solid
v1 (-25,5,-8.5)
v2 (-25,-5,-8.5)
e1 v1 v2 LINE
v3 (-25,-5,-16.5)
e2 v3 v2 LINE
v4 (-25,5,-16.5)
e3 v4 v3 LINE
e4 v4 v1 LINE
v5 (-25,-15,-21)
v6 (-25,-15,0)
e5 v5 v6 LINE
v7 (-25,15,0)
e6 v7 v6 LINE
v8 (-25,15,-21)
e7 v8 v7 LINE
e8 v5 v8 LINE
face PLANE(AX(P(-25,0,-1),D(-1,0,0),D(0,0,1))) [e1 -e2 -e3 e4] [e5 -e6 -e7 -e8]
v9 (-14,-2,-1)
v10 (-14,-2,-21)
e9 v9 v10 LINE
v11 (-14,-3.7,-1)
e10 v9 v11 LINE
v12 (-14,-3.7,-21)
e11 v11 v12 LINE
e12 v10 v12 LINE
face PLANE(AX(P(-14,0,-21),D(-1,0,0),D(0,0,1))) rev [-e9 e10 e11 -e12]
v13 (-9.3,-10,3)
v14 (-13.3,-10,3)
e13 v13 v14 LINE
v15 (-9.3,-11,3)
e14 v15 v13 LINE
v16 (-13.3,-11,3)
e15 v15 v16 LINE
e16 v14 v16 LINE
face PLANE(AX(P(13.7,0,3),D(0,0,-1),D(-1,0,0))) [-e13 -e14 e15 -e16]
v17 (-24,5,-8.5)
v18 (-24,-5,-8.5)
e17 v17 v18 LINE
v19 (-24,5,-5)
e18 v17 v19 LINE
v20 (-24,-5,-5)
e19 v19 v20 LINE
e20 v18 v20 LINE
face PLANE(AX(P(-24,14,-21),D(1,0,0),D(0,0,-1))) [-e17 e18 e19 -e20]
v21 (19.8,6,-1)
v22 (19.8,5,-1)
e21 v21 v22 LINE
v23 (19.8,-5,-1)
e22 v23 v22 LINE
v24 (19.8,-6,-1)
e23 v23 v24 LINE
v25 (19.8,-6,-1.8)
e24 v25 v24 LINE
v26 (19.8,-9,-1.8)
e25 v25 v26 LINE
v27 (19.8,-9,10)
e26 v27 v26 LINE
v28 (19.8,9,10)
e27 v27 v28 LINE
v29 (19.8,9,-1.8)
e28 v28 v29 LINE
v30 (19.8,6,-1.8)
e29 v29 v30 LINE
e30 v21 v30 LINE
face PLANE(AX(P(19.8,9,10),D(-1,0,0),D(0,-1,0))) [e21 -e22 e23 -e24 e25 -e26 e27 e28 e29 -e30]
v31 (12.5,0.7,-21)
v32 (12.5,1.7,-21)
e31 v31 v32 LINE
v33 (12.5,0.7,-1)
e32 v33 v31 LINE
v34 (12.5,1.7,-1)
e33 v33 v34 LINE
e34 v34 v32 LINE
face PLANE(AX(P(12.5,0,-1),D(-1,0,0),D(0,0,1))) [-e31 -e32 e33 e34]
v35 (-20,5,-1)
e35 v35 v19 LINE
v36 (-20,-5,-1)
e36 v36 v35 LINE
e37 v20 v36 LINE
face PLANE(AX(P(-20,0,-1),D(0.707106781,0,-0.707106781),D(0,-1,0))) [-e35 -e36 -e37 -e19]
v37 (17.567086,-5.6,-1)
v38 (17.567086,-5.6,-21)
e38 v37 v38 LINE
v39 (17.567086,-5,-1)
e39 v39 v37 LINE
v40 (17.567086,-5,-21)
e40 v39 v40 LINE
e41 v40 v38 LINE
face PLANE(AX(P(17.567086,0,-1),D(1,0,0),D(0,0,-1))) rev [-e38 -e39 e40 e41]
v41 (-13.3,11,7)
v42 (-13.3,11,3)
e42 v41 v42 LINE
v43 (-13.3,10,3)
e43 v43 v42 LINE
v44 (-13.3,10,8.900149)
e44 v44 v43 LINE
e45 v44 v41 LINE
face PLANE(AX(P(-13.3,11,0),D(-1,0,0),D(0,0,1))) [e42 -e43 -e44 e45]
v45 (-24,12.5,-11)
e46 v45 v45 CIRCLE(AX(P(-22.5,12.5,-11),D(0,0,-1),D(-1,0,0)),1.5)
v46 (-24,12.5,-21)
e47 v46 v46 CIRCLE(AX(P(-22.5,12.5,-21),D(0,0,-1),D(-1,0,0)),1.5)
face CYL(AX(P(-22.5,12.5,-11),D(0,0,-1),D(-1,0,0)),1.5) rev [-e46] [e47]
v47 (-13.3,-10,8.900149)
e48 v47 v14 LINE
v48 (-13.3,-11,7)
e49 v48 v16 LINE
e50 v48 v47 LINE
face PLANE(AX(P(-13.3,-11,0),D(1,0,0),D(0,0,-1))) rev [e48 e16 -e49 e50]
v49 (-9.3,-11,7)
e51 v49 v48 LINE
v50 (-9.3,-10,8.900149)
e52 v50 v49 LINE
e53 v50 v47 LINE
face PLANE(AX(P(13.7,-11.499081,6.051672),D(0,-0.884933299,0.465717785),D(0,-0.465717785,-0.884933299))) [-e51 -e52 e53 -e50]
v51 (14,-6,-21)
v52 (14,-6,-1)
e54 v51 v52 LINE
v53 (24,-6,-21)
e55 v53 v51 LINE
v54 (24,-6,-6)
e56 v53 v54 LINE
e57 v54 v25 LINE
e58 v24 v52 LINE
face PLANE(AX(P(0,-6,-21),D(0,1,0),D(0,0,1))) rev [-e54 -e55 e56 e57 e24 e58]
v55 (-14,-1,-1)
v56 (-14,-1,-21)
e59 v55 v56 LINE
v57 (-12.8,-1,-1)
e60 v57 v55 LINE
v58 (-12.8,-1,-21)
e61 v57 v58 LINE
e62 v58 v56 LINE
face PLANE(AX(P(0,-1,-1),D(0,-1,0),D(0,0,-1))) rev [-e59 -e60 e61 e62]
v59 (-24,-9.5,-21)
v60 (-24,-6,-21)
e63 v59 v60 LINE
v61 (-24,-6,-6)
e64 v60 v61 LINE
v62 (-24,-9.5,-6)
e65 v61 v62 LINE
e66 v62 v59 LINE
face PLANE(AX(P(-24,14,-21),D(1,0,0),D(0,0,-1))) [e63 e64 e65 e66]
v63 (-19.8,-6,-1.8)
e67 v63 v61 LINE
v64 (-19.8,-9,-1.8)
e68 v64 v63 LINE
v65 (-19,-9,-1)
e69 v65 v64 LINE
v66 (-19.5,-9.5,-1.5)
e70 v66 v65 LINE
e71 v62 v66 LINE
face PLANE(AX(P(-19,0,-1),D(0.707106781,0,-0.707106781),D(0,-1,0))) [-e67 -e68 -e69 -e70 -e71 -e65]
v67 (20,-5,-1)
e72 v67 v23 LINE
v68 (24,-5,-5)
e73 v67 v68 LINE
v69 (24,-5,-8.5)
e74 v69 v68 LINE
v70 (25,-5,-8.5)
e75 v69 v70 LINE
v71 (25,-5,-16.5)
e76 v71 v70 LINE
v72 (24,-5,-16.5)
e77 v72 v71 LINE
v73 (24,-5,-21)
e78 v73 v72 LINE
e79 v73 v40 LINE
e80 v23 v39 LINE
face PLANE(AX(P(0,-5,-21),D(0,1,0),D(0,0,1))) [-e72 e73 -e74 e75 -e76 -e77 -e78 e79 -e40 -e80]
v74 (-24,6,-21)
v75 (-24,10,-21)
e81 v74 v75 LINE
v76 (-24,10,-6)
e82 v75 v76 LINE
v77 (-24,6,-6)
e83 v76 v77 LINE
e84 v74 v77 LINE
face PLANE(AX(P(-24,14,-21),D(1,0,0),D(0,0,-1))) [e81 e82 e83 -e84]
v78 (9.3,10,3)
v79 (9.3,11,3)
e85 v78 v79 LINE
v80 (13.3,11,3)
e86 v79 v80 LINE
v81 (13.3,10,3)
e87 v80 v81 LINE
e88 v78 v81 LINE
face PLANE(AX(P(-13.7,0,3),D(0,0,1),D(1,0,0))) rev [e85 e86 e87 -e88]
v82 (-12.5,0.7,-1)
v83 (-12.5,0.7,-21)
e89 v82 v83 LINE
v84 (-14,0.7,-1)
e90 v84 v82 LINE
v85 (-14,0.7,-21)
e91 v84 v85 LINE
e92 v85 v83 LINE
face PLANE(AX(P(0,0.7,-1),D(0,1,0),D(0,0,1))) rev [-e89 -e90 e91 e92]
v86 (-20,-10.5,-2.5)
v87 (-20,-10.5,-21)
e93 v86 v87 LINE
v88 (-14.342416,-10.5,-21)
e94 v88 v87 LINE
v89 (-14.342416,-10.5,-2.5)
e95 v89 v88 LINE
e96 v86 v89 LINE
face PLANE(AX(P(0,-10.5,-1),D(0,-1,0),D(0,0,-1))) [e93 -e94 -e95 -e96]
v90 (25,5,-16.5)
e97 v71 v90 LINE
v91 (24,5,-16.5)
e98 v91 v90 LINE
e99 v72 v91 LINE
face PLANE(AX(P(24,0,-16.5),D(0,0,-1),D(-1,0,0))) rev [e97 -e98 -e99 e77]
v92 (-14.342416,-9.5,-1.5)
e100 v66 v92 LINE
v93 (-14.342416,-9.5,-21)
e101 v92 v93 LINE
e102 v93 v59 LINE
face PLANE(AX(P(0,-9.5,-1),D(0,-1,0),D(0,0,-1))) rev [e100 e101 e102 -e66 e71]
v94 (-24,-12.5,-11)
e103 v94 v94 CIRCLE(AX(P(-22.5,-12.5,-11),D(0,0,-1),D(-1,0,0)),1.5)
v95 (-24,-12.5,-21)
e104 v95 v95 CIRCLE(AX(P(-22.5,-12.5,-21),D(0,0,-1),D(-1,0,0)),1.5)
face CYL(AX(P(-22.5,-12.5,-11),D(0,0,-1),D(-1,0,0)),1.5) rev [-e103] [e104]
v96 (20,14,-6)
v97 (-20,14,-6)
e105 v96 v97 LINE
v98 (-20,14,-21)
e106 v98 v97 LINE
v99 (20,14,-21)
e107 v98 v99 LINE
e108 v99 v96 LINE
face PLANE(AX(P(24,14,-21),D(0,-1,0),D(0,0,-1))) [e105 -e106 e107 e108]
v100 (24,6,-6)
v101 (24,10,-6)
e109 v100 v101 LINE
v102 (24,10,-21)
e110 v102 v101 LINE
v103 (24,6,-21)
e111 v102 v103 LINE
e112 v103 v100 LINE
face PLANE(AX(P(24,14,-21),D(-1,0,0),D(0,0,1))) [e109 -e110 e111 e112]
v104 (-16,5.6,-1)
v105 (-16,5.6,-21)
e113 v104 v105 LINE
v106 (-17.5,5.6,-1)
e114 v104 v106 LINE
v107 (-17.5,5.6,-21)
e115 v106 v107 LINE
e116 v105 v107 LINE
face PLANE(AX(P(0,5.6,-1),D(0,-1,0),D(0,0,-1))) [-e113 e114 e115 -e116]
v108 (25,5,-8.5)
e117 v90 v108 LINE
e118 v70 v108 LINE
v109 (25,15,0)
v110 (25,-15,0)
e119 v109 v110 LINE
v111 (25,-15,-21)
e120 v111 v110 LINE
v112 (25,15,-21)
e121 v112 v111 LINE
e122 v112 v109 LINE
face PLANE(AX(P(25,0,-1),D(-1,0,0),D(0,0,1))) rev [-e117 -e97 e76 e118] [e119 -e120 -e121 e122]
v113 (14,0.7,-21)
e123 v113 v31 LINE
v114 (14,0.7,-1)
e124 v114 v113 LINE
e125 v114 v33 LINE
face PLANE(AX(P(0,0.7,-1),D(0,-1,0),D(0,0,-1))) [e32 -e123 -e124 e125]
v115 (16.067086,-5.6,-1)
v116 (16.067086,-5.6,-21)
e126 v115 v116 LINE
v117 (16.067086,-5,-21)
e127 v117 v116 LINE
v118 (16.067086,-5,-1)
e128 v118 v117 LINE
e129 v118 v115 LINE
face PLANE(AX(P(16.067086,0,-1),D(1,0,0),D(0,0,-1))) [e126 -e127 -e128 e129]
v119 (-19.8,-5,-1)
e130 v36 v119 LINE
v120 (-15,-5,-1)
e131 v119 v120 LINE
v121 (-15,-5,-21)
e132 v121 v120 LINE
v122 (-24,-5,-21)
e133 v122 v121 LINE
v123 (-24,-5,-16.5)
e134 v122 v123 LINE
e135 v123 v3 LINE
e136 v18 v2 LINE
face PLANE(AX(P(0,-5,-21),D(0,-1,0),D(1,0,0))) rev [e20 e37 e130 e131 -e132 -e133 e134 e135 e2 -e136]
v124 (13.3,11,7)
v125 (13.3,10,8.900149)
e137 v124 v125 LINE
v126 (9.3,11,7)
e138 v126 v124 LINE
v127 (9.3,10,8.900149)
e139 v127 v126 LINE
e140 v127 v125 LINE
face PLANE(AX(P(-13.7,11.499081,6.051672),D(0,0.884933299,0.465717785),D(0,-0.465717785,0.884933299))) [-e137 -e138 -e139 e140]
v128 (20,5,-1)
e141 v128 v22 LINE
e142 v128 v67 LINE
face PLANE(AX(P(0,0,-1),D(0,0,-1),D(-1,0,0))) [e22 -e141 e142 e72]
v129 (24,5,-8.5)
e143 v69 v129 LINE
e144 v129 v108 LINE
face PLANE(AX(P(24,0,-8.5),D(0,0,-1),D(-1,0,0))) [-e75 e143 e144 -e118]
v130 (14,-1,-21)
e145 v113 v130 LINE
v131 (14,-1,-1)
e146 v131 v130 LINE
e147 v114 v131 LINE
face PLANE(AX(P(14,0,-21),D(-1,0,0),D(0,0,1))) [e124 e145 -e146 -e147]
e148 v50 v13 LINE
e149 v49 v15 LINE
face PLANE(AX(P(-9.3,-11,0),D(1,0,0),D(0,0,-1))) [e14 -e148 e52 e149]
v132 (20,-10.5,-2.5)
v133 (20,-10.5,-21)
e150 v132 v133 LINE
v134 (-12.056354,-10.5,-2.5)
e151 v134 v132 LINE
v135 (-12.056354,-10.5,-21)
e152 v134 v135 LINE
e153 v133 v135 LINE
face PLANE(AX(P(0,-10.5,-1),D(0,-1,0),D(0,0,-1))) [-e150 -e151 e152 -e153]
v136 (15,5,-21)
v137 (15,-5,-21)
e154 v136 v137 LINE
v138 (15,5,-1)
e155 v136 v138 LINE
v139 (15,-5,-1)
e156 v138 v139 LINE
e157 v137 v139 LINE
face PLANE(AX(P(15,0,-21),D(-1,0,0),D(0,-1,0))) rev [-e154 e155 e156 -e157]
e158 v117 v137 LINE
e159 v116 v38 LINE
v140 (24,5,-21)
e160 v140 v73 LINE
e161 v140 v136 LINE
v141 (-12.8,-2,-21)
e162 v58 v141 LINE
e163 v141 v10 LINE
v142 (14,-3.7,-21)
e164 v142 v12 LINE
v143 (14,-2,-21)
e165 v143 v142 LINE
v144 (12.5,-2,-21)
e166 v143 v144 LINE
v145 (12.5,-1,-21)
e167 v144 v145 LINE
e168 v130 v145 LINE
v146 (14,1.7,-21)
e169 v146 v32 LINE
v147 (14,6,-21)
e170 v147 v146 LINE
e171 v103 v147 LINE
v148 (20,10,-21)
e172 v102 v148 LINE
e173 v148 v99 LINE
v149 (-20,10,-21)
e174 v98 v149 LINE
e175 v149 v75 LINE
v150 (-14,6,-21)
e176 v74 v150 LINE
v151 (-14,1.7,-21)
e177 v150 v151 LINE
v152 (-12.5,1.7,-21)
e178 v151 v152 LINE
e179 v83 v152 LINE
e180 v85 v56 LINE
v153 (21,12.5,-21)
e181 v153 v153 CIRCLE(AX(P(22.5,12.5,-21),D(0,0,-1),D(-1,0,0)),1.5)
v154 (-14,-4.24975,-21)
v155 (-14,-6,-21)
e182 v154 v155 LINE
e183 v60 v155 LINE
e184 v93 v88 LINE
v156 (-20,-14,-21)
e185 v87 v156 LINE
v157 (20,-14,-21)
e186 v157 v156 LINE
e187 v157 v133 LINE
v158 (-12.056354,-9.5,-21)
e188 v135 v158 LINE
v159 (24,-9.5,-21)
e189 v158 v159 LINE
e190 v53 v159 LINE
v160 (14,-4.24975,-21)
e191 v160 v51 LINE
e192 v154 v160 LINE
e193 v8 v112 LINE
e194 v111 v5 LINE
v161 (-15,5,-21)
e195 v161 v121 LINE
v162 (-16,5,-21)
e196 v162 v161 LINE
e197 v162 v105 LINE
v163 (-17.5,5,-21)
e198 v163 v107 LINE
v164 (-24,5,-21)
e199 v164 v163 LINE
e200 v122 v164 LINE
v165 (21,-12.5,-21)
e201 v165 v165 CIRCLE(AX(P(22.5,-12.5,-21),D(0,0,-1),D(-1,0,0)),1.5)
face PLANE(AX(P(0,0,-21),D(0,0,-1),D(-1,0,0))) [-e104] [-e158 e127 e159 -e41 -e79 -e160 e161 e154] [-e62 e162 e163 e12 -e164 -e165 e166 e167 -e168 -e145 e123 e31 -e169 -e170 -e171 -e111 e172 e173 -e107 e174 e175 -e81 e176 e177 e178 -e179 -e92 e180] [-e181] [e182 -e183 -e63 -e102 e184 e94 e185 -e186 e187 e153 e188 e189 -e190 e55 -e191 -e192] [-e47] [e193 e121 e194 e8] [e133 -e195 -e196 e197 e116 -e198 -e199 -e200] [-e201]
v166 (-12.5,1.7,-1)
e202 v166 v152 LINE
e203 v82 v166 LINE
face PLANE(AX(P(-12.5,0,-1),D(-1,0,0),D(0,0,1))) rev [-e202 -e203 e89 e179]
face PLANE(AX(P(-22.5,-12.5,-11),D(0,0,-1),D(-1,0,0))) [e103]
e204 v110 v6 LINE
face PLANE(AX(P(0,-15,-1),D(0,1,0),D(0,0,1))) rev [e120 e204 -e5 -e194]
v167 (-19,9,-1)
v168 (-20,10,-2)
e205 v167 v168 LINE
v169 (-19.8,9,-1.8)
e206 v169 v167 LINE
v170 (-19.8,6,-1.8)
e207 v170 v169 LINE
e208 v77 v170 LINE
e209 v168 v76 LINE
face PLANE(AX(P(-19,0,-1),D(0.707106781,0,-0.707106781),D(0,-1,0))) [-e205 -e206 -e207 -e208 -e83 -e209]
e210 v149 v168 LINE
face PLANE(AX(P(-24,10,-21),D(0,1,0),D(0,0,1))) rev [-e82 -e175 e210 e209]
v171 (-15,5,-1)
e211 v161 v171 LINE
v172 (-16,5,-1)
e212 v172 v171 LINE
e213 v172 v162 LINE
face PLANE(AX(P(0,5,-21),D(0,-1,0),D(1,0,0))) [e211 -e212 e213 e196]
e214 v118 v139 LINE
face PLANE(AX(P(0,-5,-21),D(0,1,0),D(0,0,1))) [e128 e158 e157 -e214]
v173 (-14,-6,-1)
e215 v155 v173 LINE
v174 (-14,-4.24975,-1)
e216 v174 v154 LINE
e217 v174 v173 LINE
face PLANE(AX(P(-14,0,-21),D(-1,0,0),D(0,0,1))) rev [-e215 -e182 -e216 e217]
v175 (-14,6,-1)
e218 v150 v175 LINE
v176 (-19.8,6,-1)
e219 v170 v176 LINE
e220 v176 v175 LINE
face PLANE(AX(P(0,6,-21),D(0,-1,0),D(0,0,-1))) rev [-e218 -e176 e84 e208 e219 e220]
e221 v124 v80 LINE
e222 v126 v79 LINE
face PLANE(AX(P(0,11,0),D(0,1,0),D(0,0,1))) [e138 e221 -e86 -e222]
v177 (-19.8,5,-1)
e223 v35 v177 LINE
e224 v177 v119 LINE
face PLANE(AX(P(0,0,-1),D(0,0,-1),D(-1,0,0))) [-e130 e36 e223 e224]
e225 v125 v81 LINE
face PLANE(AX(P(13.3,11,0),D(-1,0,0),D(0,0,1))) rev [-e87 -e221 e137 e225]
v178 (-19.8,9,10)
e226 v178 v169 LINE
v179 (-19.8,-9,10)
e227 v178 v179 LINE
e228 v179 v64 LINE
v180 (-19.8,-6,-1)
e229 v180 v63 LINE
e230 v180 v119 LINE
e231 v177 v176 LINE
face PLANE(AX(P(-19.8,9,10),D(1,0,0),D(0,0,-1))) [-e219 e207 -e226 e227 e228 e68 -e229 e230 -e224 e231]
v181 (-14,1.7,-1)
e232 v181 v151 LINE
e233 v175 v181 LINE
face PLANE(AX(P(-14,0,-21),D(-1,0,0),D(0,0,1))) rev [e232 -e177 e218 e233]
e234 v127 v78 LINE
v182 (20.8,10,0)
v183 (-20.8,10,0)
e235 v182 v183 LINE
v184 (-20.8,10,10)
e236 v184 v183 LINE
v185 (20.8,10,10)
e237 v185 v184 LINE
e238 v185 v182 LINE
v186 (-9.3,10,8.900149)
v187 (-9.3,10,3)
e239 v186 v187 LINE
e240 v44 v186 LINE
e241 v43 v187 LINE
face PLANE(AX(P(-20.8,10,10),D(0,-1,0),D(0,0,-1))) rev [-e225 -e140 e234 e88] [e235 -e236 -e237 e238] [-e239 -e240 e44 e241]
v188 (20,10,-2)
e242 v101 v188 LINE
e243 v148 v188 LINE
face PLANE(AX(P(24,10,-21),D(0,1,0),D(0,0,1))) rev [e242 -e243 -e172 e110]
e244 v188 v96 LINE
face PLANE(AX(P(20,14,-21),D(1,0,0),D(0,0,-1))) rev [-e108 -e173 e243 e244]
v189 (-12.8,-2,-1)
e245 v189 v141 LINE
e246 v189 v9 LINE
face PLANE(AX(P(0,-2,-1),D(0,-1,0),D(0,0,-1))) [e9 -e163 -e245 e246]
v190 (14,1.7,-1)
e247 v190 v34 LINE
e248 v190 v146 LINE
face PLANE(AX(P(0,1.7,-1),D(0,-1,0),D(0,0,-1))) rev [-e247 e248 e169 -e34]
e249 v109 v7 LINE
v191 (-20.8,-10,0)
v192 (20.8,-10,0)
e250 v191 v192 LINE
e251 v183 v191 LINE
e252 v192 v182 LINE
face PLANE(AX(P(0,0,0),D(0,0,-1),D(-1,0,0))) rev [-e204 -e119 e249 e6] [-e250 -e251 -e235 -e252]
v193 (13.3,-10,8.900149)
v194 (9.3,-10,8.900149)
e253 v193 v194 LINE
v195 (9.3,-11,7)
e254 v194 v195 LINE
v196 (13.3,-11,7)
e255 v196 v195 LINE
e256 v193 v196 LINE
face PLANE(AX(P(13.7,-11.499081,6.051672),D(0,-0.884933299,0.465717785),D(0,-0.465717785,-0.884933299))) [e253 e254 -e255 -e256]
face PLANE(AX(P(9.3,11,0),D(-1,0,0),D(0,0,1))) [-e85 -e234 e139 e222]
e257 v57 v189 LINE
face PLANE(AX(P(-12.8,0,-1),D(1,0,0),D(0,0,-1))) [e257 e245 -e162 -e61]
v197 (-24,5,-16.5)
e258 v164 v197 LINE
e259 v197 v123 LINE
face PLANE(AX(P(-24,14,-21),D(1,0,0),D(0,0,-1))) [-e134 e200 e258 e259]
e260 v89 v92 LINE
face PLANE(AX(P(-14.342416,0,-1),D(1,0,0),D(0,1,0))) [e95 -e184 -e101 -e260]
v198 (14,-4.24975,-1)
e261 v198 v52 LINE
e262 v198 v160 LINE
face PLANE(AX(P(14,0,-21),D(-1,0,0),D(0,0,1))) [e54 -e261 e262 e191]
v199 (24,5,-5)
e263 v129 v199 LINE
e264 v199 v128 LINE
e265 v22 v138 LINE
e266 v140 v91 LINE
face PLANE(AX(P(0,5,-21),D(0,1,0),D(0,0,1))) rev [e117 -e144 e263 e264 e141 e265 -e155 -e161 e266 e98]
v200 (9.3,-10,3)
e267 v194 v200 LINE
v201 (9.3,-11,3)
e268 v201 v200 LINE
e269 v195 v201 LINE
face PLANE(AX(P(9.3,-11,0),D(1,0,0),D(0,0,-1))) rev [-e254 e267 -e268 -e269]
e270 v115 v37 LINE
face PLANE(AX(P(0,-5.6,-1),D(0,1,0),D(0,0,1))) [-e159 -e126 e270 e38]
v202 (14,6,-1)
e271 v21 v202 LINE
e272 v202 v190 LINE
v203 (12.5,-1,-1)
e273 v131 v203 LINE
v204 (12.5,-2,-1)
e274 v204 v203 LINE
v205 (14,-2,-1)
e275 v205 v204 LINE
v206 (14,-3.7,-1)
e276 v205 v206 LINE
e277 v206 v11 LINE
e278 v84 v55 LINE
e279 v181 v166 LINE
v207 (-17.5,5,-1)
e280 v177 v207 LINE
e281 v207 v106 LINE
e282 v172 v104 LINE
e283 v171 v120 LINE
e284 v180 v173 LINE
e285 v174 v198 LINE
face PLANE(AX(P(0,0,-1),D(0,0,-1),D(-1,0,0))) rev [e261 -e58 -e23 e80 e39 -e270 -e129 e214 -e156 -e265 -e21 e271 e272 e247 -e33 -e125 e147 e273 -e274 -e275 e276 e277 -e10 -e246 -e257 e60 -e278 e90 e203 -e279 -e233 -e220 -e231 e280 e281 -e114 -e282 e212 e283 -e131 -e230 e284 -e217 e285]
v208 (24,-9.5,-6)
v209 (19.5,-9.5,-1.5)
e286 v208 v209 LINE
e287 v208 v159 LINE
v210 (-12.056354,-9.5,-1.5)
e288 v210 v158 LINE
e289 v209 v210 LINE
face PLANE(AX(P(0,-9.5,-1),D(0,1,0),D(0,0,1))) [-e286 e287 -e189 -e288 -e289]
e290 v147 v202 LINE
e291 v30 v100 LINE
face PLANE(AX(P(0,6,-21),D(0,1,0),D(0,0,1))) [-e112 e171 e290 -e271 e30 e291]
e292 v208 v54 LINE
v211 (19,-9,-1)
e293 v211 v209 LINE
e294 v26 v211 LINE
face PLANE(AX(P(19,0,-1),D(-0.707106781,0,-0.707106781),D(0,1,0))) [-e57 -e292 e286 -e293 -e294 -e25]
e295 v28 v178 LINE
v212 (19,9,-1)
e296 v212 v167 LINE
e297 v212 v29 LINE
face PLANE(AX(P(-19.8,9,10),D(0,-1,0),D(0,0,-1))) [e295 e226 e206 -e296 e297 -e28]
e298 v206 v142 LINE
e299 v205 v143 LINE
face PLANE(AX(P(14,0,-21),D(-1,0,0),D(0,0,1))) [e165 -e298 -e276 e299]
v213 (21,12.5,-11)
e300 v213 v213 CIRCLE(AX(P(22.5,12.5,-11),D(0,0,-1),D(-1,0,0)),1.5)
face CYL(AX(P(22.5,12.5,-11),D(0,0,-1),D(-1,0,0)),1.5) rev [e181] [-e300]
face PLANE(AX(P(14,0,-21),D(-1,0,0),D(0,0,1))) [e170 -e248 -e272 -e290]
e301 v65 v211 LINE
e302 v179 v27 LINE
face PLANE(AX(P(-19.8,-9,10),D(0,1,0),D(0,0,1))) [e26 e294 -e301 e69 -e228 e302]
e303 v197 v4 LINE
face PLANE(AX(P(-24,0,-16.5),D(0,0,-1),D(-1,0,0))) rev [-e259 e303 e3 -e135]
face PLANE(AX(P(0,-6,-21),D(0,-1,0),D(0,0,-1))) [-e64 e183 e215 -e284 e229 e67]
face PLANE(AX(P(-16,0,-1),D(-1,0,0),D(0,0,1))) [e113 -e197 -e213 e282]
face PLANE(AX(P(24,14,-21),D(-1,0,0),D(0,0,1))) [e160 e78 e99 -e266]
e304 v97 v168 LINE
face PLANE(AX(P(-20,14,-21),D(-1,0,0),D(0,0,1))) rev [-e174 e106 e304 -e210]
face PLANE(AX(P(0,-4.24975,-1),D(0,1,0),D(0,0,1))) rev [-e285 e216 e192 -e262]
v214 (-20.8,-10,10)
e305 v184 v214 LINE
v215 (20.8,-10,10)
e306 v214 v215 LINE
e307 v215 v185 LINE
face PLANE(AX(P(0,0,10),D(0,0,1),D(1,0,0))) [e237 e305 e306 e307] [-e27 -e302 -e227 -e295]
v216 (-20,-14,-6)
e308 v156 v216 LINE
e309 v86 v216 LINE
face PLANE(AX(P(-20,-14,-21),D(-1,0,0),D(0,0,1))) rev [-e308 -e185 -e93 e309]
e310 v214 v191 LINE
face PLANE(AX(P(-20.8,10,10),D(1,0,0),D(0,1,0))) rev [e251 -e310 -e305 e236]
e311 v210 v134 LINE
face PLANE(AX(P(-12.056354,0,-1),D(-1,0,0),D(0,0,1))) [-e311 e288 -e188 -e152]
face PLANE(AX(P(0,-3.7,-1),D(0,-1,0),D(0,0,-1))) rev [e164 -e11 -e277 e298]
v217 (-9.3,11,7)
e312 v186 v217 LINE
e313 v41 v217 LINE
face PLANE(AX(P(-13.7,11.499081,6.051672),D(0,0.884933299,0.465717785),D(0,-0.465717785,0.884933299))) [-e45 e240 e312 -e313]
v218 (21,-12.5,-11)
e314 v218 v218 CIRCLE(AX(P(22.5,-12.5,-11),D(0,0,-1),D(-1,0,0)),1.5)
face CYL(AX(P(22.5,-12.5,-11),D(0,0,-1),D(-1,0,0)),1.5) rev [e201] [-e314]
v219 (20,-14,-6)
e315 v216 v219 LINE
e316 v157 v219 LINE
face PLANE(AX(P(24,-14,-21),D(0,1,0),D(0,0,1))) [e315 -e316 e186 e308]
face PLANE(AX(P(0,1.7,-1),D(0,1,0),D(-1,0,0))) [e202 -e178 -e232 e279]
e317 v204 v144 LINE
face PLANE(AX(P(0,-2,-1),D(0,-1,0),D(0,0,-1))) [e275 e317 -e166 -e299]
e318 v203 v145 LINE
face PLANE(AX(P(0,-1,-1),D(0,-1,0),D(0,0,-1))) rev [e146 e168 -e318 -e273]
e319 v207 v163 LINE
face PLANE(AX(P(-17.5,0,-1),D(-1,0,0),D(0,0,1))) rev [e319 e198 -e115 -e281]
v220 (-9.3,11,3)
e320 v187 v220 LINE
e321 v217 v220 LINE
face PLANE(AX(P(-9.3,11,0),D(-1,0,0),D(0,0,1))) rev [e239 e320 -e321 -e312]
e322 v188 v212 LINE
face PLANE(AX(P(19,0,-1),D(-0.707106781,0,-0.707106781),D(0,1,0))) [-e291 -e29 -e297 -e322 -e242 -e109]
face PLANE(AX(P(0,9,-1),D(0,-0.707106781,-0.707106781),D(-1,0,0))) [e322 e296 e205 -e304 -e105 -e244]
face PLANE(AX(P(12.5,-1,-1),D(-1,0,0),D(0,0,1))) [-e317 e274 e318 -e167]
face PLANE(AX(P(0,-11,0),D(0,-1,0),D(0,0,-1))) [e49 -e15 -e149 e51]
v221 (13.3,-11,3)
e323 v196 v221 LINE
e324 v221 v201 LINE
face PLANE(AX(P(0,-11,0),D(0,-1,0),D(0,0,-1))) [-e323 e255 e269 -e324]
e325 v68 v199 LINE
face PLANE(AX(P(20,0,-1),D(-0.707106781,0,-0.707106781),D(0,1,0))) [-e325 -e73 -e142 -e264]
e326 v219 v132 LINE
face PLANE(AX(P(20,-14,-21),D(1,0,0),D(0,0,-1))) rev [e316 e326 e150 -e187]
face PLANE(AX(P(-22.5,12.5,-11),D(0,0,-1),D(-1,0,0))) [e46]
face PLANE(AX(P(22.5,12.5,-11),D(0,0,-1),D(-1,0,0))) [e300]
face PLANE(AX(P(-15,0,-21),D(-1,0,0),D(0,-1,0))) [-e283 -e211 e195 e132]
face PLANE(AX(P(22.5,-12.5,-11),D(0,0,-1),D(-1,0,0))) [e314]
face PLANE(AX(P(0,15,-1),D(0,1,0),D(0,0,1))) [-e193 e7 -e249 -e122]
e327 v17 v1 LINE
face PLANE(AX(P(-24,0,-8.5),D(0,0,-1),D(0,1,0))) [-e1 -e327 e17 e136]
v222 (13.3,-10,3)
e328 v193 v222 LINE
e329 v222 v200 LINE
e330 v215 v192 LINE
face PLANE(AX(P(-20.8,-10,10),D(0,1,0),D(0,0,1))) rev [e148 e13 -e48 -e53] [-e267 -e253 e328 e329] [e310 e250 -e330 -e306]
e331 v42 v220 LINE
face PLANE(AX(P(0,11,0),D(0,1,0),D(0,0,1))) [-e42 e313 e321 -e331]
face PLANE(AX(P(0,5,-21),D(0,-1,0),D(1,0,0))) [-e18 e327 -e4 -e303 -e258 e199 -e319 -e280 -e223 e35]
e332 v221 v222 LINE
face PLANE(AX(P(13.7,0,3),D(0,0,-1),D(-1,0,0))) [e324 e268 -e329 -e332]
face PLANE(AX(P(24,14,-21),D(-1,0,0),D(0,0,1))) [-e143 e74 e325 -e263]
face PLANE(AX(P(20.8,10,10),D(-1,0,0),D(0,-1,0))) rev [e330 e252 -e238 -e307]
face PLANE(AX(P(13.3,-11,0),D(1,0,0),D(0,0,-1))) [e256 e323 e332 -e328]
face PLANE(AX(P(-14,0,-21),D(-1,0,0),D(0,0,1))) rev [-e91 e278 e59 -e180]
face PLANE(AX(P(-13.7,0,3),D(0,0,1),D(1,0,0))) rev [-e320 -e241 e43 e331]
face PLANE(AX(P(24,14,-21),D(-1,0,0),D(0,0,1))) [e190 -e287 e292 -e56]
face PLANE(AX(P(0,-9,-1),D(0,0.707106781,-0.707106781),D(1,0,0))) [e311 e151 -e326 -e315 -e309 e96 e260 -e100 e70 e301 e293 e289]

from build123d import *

# Parameters (mm, degrees)
SKETCH1_W            = 41.6
SKETCH1_H            = 20
SKETCH1_W_2          = 39.6
SKETCH1_H_2          = 18
BOSS_EXTRUDE2_DEPTH  = 10
SKETCH2_W            = 4
SKETCH2_H            = 10
BOSS_EXTRUDE3_DEPTH  = 1
SKETCH3_W            = 3
SKETCH3_H            = 1
CUT_EXTRUDE1_DEPTH   = 27
SKETCH4_W            = 4
SKETCH4_H            = 10
BOSS_EXTRUDE4_DEPTH  = 1
SKETCH5_W            = 3
SKETCH5_H            = 1
CUT_EXTRUDE2_DEPTH   = 27
SKETCH6_W            = 50
SKETCH6_H            = 30
SKETCH6_W_2          = 41.6
SKETCH6_H_2          = 20
SKETCH6_W_3          = 39.6
SKETCH6_H_3          = 18
BOSS_EXTRUDE6_DEPTH  = 1
SKETCH7_W            = 50
SKETCH7_H            = 30
SKETCH7_W_2          = 48
SKETCH7_H_2          = 28
BOSS_EXTRUDE7_DEPTH  = 20
SKETCH8_W            = 4.2
SKETCH8_H            = 1
BOSS_EXTRUDE8_DEPTH  = 20
SKETCH9_W            = 4.2
SKETCH9_H            = 1
BOSS_EXTRUDE9_DEPTH  = 20
SKETCH10_W           = 4
SKETCH10_H           = 4
BOSS_EXTRUDE10_DEPTH = 20
SKETCH11_W           = 2
SKETCH11_H           = 10
CUT_EXTRUDE3_DEPTH   = 1
SKETCH12_W           = 2
SKETCH12_H           = 10
CUT_EXTRUDE4_DEPTH   = 1
SKETCH13_R           = 1.5
CUT_EXTRUDE5_DEPTH   = 10
CHAMFER2_SIZE        = 5
CHAMFER3_SIZE        = 5
CHAMFER4_SIZE        = 4
SKETCH16_W           = 1.2
SKETCH16_H           = 1
BOSS_EXTRUDE11_DEPTH = 20
BOSS_EXTRUDE12_DEPTH = 20
SKETCH18_W           = 28
SKETCH18_H           = 0.549749779
BOSS_EXTRUDE13_DEPTH = 20
SKETCH19_W           = 1.2
SKETCH19_H           = 1
CUT_EXTRUDE6_DEPTH   = 20
SKETCH20_W           = 1.5
SKETCH20_H           = 1
BOSS_EXTRUDE14_DEPTH = 20
SKETCH22_W           = 0.3
SKETCH22_H           = 1
BOSS_EXTRUDE16_DEPTH = 20
SKETCH24_W           = 1.2
SKETCH24_H           = 1
CUT_EXTRUDE7_DEPTH   = 20
SKETCH25_W           = 1.5
SKETCH25_H           = 1
BOSS_EXTRUDE17_DEPTH = 20
SKETCH26_W           = 1.5
SKETCH26_H           = 0.6
CUT_EXTRUDE8_DEPTH   = 20
SKETCH27_W           = 1.5
SKETCH27_H           = 0.6
CUT_EXTRUDE9_DEPTH   = 20


# Some blends are built 0.0001 mm under size
with BuildPart() as part:
    # Sketch1 → Boss-Extrude2 (new body)
    with BuildSketch(Plane.XY):
        Rectangle(SKETCH1_W, SKETCH1_H)
        Rectangle(SKETCH1_W_2, SKETCH1_H_2, mode=Mode.SUBTRACT)
    extrude(amount=BOSS_EXTRUDE2_DEPTH)

    # Sketch2 → Boss-Extrude3 (add)
    with BuildSketch(Plane.XZ.offset(10)):
        with Locations((-11.3, 5)):
            Rectangle(SKETCH2_W, SKETCH2_H)
        with Locations((11.3, 5)):
            Rectangle(SKETCH2_W, SKETCH2_H)
    extrude(amount=BOSS_EXTRUDE3_DEPTH)

    # Sketch3 → Cut-Extrude1 (cut)
    with BuildSketch(Plane.ZY.offset(13.3)):
        Polygon((8.900149248, -10), (7, -11), (10, -11), (10, -10), align=None)
        with Locations((1.5, -10.5)):
            Rectangle(SKETCH3_W, SKETCH3_H)
    extrude(amount=-CUT_EXTRUDE1_DEPTH, mode=Mode.SUBTRACT)

    # Sketch4 → Boss-Extrude4 (add)
    with BuildSketch(Plane(origin=(0, 10, 0), x_dir=(1, 0, 0), z_dir=(0, 1, 0))):
        with Locations((11.3, -5)):
            Rectangle(SKETCH4_W, SKETCH4_H)
        with Locations((-11.3, -5)):
            Rectangle(SKETCH4_W, SKETCH4_H)
    extrude(amount=BOSS_EXTRUDE4_DEPTH)

    # Sketch5 → Cut-Extrude2 (cut)
    with BuildSketch(Plane(origin=(13.3, 0, 0), x_dir=(0, 0, -1), z_dir=(1, 0, 0))):
        Polygon((-7, 11), (-10, 11), (-10, 10), (-8.900149248, 10), align=None)
        with Locations((-1.5, 10.5)):
            Rectangle(SKETCH5_W, SKETCH5_H)
    extrude(amount=-CUT_EXTRUDE2_DEPTH, mode=Mode.SUBTRACT)

    # Sketch6 → Boss-Extrude6 (add)
    # profile 1 of 2: a face of its own
    with BuildSketch(Plane(origin=(0, 0, 0), x_dir=(-1, 0, 0), z_dir=(0, 0, -1))):
        Rectangle(SKETCH6_W, SKETCH6_H)
        Rectangle(SKETCH6_W_2, SKETCH6_H_2, mode=Mode.SUBTRACT)
    # profile 2 of 2: a face of its own
    with BuildSketch(Plane(origin=(0, 0, 0), x_dir=(-1, 0, 0), z_dir=(0, 0, -1))):
        Rectangle(SKETCH6_W_2, SKETCH6_H_2)
        Rectangle(SKETCH6_W_3, SKETCH6_H_3, mode=Mode.SUBTRACT)
    extrude(amount=BOSS_EXTRUDE6_DEPTH)

    # Sketch7 → Boss-Extrude7 (add)
    with BuildSketch(Plane(origin=(0, 0, -1), x_dir=(-1, 0, 0), z_dir=(0, 0, -1))):
        Rectangle(SKETCH7_W, SKETCH7_H)
        Rectangle(SKETCH7_W_2, SKETCH7_H_2, mode=Mode.SUBTRACT)
    extrude(amount=BOSS_EXTRUDE7_DEPTH)

    # Sketch8 → Boss-Extrude8 (add)
    with BuildSketch(Plane(origin=(0, 0, -1), x_dir=(-1, 0, 0), z_dir=(0, 0, -1))):
        Polygon((-15, -5), (-19.8, -5), (-19.8, -6), (-14, -6), (-14, 6), (-19.8, 6), (-19.8, 5), (-15, 5), align=None)
        with Locations((-21.9, 5.5)):
            Rectangle(SKETCH8_W, SKETCH8_H)
        with Locations((-21.9, -5.5)):
            Rectangle(SKETCH8_W, SKETCH8_H)
    extrude(amount=BOSS_EXTRUDE8_DEPTH)

    # Sketch9 → Boss-Extrude9 (add)
    with BuildSketch(Plane(origin=(0, 0, -1), x_dir=(-1, 0, 0), z_dir=(0, 0, -1))):
        Polygon((15, 5), (19.8, 5), (19.8, 6), (14, 6), (14, -6), (19.8, -6), (19.8, -5), (15, -5), align=None)
        with Locations((21.9, 5.5)):
            Rectangle(SKETCH9_W, SKETCH9_H)
        with Locations((21.9, -5.5)):
            Rectangle(SKETCH9_W, SKETCH9_H)
    extrude(amount=BOSS_EXTRUDE9_DEPTH)

    # Sketch10 → Boss-Extrude10 (add)
    with BuildSketch(Plane(origin=(0, 0, -1), x_dir=(-1, 0, 0), z_dir=(0, 0, -1))):
        with Locations((-22, 12)):
            Rectangle(SKETCH10_W, SKETCH10_H)
        with Locations((22, 12)):
            Rectangle(SKETCH10_W, SKETCH10_H)
        with Locations((22, -12)):
            Rectangle(SKETCH10_W, SKETCH10_H)
        with Locations((-22, -12)):
            Rectangle(SKETCH10_W, SKETCH10_H)
    extrude(amount=BOSS_EXTRUDE10_DEPTH)

    # Sketch11 → Cut-Extrude3 (cut)
    with BuildSketch(Plane.ZY.offset(25)):
        Polygon((-10.5, -5), (-10.5, 5), (-16.5, 5), (-16.5, 0), (-16.5, -5), align=None)
        with Locations((-9.5, 0)):
            Rectangle(SKETCH11_W, SKETCH11_H)
    extrude(amount=-CUT_EXTRUDE3_DEPTH, mode=Mode.SUBTRACT)

    # Sketch12 → Cut-Extrude4 (cut)
    with BuildSketch(Plane(origin=(25, 0, 0), x_dir=(0, 0, -1), z_dir=(1, 0, 0))):
        with Locations((9.5, 0)):
            Rectangle(SKETCH12_W, SKETCH12_H)
        Polygon((16.5, 5), (10.5, 5), (10.5, -5), (16.5, -5), (16.5, 0), align=None)
    extrude(amount=-CUT_EXTRUDE4_DEPTH, mode=Mode.SUBTRACT)

    # Sketch13 → Cut-Extrude5 (cut)
    with BuildSketch(Plane(origin=(0, 0, -21), x_dir=(-1, 0, 0), z_dir=(0, 0, -1))):
        with Locations((-22.5, 12.5)):
            Circle(SKETCH13_R)
        with Locations((22.5, 12.5)):
            Circle(SKETCH13_R)
        with Locations((22.5, -12.5)):
            Circle(SKETCH13_R)
        with Locations((-22.5, -12.5)):
            Circle(SKETCH13_R)
    extrude(amount=-CUT_EXTRUDE5_DEPTH, mode=Mode.SUBTRACT)

    # Chamfer2
    chamfer2_edges = [part.edges().sort_by_distance(p)[0] for p in [
        (0, 14, -1),
        (0, -14, -1),
    ]]
    chamfer(chamfer2_edges, length=CHAMFER2_SIZE - 0.0001)  # a hair under: the kernel refuses the full size

    # Chamfer3
    # the kernel refuses this chamfer: 5 mm, written as the material it adds along each edge
    with BuildSketch(Plane(origin=(24, -21.85851494, -1), x_dir=(-0.9996219169112968, 0, 0.02749587661058636), z_dir=(0, 1, 0))) as chamfer3_piece_1_section:
        Polygon((CHAMFER3_SIZE * 0.999621916911, -CHAMFER3_SIZE * 0.0274958766106), (-CHAMFER3_SIZE * 0.0274958766106, -CHAMFER3_SIZE * 0.999621916911), (0, 0), align=None)
    chamfer3_piece_1 = extrude(amount=28.71692988, mode=Mode.PRIVATE)
    chamfer3_piece_1 = split(chamfer3_piece_1, bisect_by=Plane(origin=(19.8, -10.000025, -1.99995), z_dir=(1, 0, 0)), keep=Keep.TOP, mode=Mode.PRIVATE)
    chamfer3_piece_1 = split(chamfer3_piece_1, bisect_by=Plane(origin=(19.999975, -5, -1.99995), z_dir=(0, -1, 0)), keep=Keep.TOP, mode=Mode.PRIVATE)
    chamfer3_piece_1 = split(chamfer3_piece_1, bisect_by=Plane(origin=(19.999975, -10.0000375, -1.9999375), z_dir=(0, 0.7071067811865476, -0.7071067811865476)), keep=Keep.TOP, mode=Mode.PRIVATE)
    add(chamfer3_piece_1)
    with BuildSketch(Plane(origin=(24, -21.85851494, -1), x_dir=(-0.9996219169112968, 0, 0.02749587661058636), z_dir=(0, 1, 0))) as chamfer3_piece_2_section:
        Polygon((CHAMFER3_SIZE * 0.999621916911, -CHAMFER3_SIZE * 0.0274958766106), (-CHAMFER3_SIZE * 0.0274958766106, -CHAMFER3_SIZE * 0.999621916911), (0, 0), align=None)
    chamfer3_piece_2 = extrude(amount=28.71692988, mode=Mode.PRIVATE)
    chamfer3_piece_2 = split(chamfer3_piece_2, bisect_by=Plane(origin=(19.599975009, -9, -1.399950019), z_dir=(0, -1, 0)), keep=Keep.TOP, mode=Mode.PRIVATE)
    chamfer3_piece_2 = split(chamfer3_piece_2, bisect_by=Plane(origin=(19.599975009, -9.300037514, -1.299937514), z_dir=(0, 0.7071067811865476, -0.7071067811865476)), keep=Keep.TOP, mode=Mode.PRIVATE)
    add(chamfer3_piece_2)
    with BuildSketch(Plane(origin=(24, -21.85851494, -1), x_dir=(-0.9996219169112968, 0, 0.02749587661058636), z_dir=(0, 1, 0))) as chamfer3_piece_3_section:
        Polygon((CHAMFER3_SIZE * 0.999621916911, -CHAMFER3_SIZE * 0.0274958766106), (-CHAMFER3_SIZE * 0.0274958766106, -CHAMFER3_SIZE * 0.999621916911), (0, 0), align=None)
    chamfer3_piece_3 = extrude(amount=28.71692988, mode=Mode.PRIVATE)
    chamfer3_piece_3 = split(chamfer3_piece_3, bisect_by=Plane(origin=(19.8, 6.42920747, -1.451851852), z_dir=(1, 0, 0)), keep=Keep.TOP, mode=Mode.PRIVATE)
    chamfer3_piece_3 = split(chamfer3_piece_3, bisect_by=Plane(origin=(19.903703704, 5, -1.451851852), z_dir=(0, 1, 0)), keep=Keep.TOP, mode=Mode.PRIVATE)
    add(chamfer3_piece_3)
    with BuildSketch(Plane(origin=(-24, 21.85851494, -1), x_dir=(0.9996219169112968, 0, 0.02749587661058636), z_dir=(0, -1, 0))) as chamfer3_piece_4_section:
        Polygon((CHAMFER3_SIZE * 0.999621916911, -CHAMFER3_SIZE * 0.0274958766106), (-CHAMFER3_SIZE * 0.0274958766106, -CHAMFER3_SIZE * 0.999621916911), (0, 0), align=None)
    chamfer3_piece_4 = extrude(amount=28.71692988, mode=Mode.PRIVATE)
    chamfer3_piece_4 = split(chamfer3_piece_4, bisect_by=Plane(origin=(-19.8, 10.000025, -1.99995), z_dir=(-1, 0, 0)), keep=Keep.TOP, mode=Mode.PRIVATE)
    chamfer3_piece_4 = split(chamfer3_piece_4, bisect_by=Plane(origin=(-19.999975, 15, -1.99995), z_dir=(0, -1, 0)), keep=Keep.TOP, mode=Mode.PRIVATE)
    chamfer3_piece_4 = split(chamfer3_piece_4, bisect_by=Plane(origin=(-19.999975, 5, -1.99995), z_dir=(0, 1, 0)), keep=Keep.TOP, mode=Mode.PRIVATE)
    add(chamfer3_piece_4)
    with BuildSketch(Plane(origin=(-24, 21.85851494, -1), x_dir=(0.9996219169112968, 0, 0.02749587661058636), z_dir=(0, -1, 0))) as chamfer3_piece_5_section:
        Polygon((CHAMFER3_SIZE * 0.999621916911, -CHAMFER3_SIZE * 0.0274958766106), (-CHAMFER3_SIZE * 0.0274958766106, -CHAMFER3_SIZE * 0.999621916911), (0, 0), align=None)
    chamfer3_piece_5 = extrude(amount=28.71692988, mode=Mode.PRIVATE)
    chamfer3_piece_5 = split(chamfer3_piece_5, bisect_by=Plane(origin=(-19.599975009, 9, -1.399950019), z_dir=(0, 1, 0)), keep=Keep.TOP, mode=Mode.PRIVATE)
    chamfer3_piece_5 = split(chamfer3_piece_5, bisect_by=Plane(origin=(-19.599975009, 15, -1.399950019), z_dir=(0, -1, 0)), keep=Keep.TOP, mode=Mode.PRIVATE)
    add(chamfer3_piece_5)
    with BuildSketch(Plane(origin=(-24, 21.85851494, -1), x_dir=(0.9996219169112968, 0, 0.02749587661058636), z_dir=(0, -1, 0))) as chamfer3_piece_6_section:
        Polygon((CHAMFER3_SIZE * 0.999621916911, -CHAMFER3_SIZE * 0.0274958766106), (-CHAMFER3_SIZE * 0.0274958766106, -CHAMFER3_SIZE * 0.999621916911), (0, 0), align=None)
    chamfer3_piece_6 = extrude(amount=28.71692988, mode=Mode.PRIVATE)
    chamfer3_piece_6 = split(chamfer3_piece_6, bisect_by=Plane(origin=(-19.8, -6.42920747, -1.451851852), z_dir=(-1, 0, 0)), keep=Keep.TOP, mode=Mode.PRIVATE)
    chamfer3_piece_6 = split(chamfer3_piece_6, bisect_by=Plane(origin=(-19.903703704, -6, -1.451851852), z_dir=(0, -1, 0)), keep=Keep.TOP, mode=Mode.PRIVATE)
    add(chamfer3_piece_6)
    with BuildSketch(Plane(origin=(-24, 6.85841494, -1), x_dir=(0.9996219169112968, 0, 0.02749587661058636), z_dir=(0, -1, 0))) as chamfer3_piece_7_section:
        Polygon((CHAMFER3_SIZE * 0.999621916911, -CHAMFER3_SIZE * 0.0274958766106), (-CHAMFER3_SIZE * 0.0274958766106, -CHAMFER3_SIZE * 0.999621916911), (0, 0), align=None)
    chamfer3_piece_7 = extrude(amount=28.71692988, mode=Mode.PRIVATE)
    chamfer3_piece_7 = split(chamfer3_piece_7, bisect_by=Plane(origin=(-19.8, 6.42920747, -1.451851852), z_dir=(-1, 0, 0)), keep=Keep.TOP, mode=Mode.PRIVATE)
    chamfer3_piece_7 = split(chamfer3_piece_7, bisect_by=Plane(origin=(-19.903703704, 5, -1.451851852), z_dir=(0, 1, 0)), keep=Keep.TOP, mode=Mode.PRIVATE)
    add(chamfer3_piece_7)
    with BuildSketch(Plane(origin=(-24, -6, -1), x_dir=(0.9996219169112968, 0, 0.02749587661058636), z_dir=(0, -1, 0))) as chamfer3_piece_8_section:
        Polygon((CHAMFER3_SIZE * 0.999621916911, -CHAMFER3_SIZE * 0.0274958766106), (-CHAMFER3_SIZE * 0.0274958766106, -CHAMFER3_SIZE * 0.999621916911), (0, 0), align=None)
    chamfer3_piece_8 = extrude(amount=15.85851494, mode=Mode.PRIVATE)
    chamfer3_piece_8 = split(chamfer3_piece_8, bisect_by=Plane(origin=(-19.8, -7.5, -1.451851852), z_dir=(-1, 0, 0)), keep=Keep.TOP, mode=Mode.PRIVATE)
    chamfer3_piece_8 = split(chamfer3_piece_8, bisect_by=Plane(origin=(-19.903703704, -8.475975926, -0.475875926), z_dir=(0, 0.7071067811865476, -0.7071067811865476)), keep=Keep.TOP, mode=Mode.PRIVATE)
    add(chamfer3_piece_8)
    with BuildSketch(Plane(origin=(-24, 6.85841494, -1), x_dir=(0.9996219169112968, 0, 0.02749587661058636), z_dir=(0, -1, 0))) as chamfer3_piece_9_section:
        Polygon((CHAMFER3_SIZE * 0.999621916911, -CHAMFER3_SIZE * 0.0274958766106), (-CHAMFER3_SIZE * 0.0274958766106, -CHAMFER3_SIZE * 0.999621916911), (0, 0), align=None)
    chamfer3_piece_9 = extrude(amount=28.71692988, mode=Mode.PRIVATE)
    chamfer3_piece_9 = split(chamfer3_piece_9, bisect_by=Plane(origin=(-19.599975009, -9, -1.399950019), z_dir=(0, -1, 0)), keep=Keep.TOP, mode=Mode.PRIVATE)
    chamfer3_piece_9 = split(chamfer3_piece_9, bisect_by=Plane(origin=(-19.599975009, -9.300037514, -1.299937514), z_dir=(0, 0.7071067811865476, -0.7071067811865476)), keep=Keep.TOP, mode=Mode.PRIVATE)
    add(chamfer3_piece_9)
    with BuildSketch(Plane(origin=(24, -6.85841494, -1), x_dir=(-0.9996219169112968, 0, 0.02749587661058636), z_dir=(0, 1, 0))) as chamfer3_piece_10_section:
        Polygon((CHAMFER3_SIZE * 0.999621916911, -CHAMFER3_SIZE * 0.0274958766106), (-CHAMFER3_SIZE * 0.0274958766106, -CHAMFER3_SIZE * 0.999621916911), (0, 0), align=None)
    chamfer3_piece_10 = extrude(amount=28.71692988, mode=Mode.PRIVATE)
    chamfer3_piece_10 = split(chamfer3_piece_10, bisect_by=Plane(origin=(19.8, -6.42920747, -1.451851852), z_dir=(1, 0, 0)), keep=Keep.TOP, mode=Mode.PRIVATE)
    chamfer3_piece_10 = split(chamfer3_piece_10, bisect_by=Plane(origin=(19.903703704, -5, -1.451851852), z_dir=(0, -1, 0)), keep=Keep.TOP, mode=Mode.PRIVATE)
    add(chamfer3_piece_10)
    with BuildSketch(Plane(origin=(24, -6.85841494, -1), x_dir=(-0.9996219169112968, 0, 0.02749587661058636), z_dir=(0, 1, 0))) as chamfer3_piece_11_section:
        Polygon((CHAMFER3_SIZE * 0.999621916911, -CHAMFER3_SIZE * 0.0274958766106), (-CHAMFER3_SIZE * 0.0274958766106, -CHAMFER3_SIZE * 0.999621916911), (0, 0), align=None)
    chamfer3_piece_11 = extrude(amount=28.71692988, mode=Mode.PRIVATE)
    chamfer3_piece_11 = split(chamfer3_piece_11, bisect_by=Plane(origin=(19.8, 7.5, -1.451851852), z_dir=(1, 0, 0)), keep=Keep.TOP, mode=Mode.PRIVATE)
    chamfer3_piece_11 = split(chamfer3_piece_11, bisect_by=Plane(origin=(19.903703704, 15, -1.451851852), z_dir=(0, -1, 0)), keep=Keep.TOP, mode=Mode.PRIVATE)
    chamfer3_piece_11 = split(chamfer3_piece_11, bisect_by=Plane(origin=(19.903703704, 5, -1.451851852), z_dir=(0, 1, 0)), keep=Keep.TOP, mode=Mode.PRIVATE)
    add(chamfer3_piece_11)
    with BuildSketch(Plane(origin=(24, -6.85841494, -1), x_dir=(-0.9996219169112968, 0, 0.02749587661058636), z_dir=(0, 1, 0))) as chamfer3_piece_12_section:
        Polygon((CHAMFER3_SIZE * 0.999621916911, -CHAMFER3_SIZE * 0.0274958766106), (-CHAMFER3_SIZE * 0.0274958766106, -CHAMFER3_SIZE * 0.999621916911), (0, 0), align=None)
    chamfer3_piece_12 = extrude(amount=28.71692988, mode=Mode.PRIVATE)
    chamfer3_piece_12 = split(chamfer3_piece_12, bisect_by=Plane(origin=(19.599975009, 9, -1.399950019), z_dir=(0, 1, 0)), keep=Keep.TOP, mode=Mode.PRIVATE)
    chamfer3_piece_12 = split(chamfer3_piece_12, bisect_by=Plane(origin=(19.599975009, 15, -1.399950019), z_dir=(0, -1, 0)), keep=Keep.TOP, mode=Mode.PRIVATE)
    add(chamfer3_piece_12)

    # Chamfer4
    chamfer4_edges = [part.edges().sort_by_distance(p)[0] for p in [
        (24, 0, -1),
        (-24, 0, -1),
    ]]
    chamfer(chamfer4_edges, length=CHAMFER4_SIZE)

    # Sketch16 → Boss-Extrude11 (add)
    with BuildSketch(Plane(origin=(0, 0, -21), x_dir=(-1, 0, 0), z_dir=(0, 0, -1))):
        with Locations((-13.4, 0.5)):
            Rectangle(SKETCH16_W, SKETCH16_H)
        with Locations((-13.4, -1.5)):
            Rectangle(SKETCH16_W, SKETCH16_H)
        with Locations((13.4, 0.5)):
            Rectangle(SKETCH16_W, SKETCH16_H)
        Polygon((13, -1), (12.8, -1), (12.8, -2), (14, -2), (14, -1), align=None)
    extrude(amount=-BOSS_EXTRUDE11_DEPTH)

    # Sketch17 → Boss-Extrude12 (add)
    with BuildSketch(Plane(origin=(0, 0, -21), x_dir=(-1, 0, 0), z_dir=(0, 0, -1))):
        Polygon((-20, -10), (-20, -10.5), (-16.744161901, -10.5), (12.056353702, -10.5), (12.056353702, -9.5), (-24, -9.5), (-24, -10), align=None)
        Polygon((14.342415664, -9.5), (14.342415664, -10.5), (20, -10.5), (20, -10), (24, -10), (24, -9.5), align=None)
    extrude(amount=-BOSS_EXTRUDE12_DEPTH)

    # Sketch18 → Boss-Extrude13 (add)
    with BuildSketch(Plane(origin=(0, 0, -21), x_dir=(-1, 0, 0), z_dir=(0, 0, -1))):
        with Locations((0, -3.97487489)):
            Rectangle(SKETCH18_W, SKETCH18_H)
    extrude(amount=-BOSS_EXTRUDE13_DEPTH)

    # Sketch19 → Cut-Extrude6 (cut)
    with BuildSketch(Plane(origin=(0, 0, -21), x_dir=(-1, 0, 0), z_dir=(0, 0, -1))):
        with Locations((-13.4, 0.5)):
            Rectangle(SKETCH19_W, SKETCH19_H)
    extrude(amount=-CUT_EXTRUDE6_DEPTH, mode=Mode.SUBTRACT)

    # Sketch20 → Boss-Extrude14 (add)
    with BuildSketch(Plane(origin=(0, 0, -21), x_dir=(-1, 0, 0), z_dir=(0, 0, -1))):
        with Locations((-13.25, 1.2)):
            Rectangle(SKETCH20_W, SKETCH20_H)
    extrude(amount=-BOSS_EXTRUDE14_DEPTH)

    # Sketch22 → Boss-Extrude16 (add)
    with BuildSketch(Plane(origin=(0, 0, -21), x_dir=(-1, 0, 0), z_dir=(0, 0, -1))):
        with Locations((-12.65, -1.5)):
            Rectangle(SKETCH22_W, SKETCH22_H)
    extrude(amount=-BOSS_EXTRUDE16_DEPTH)

    # Sketch24 → Cut-Extrude7 (cut)
    with BuildSketch(Plane(origin=(0, 0, -21), x_dir=(-1, 0, 0), z_dir=(0, 0, -1))):
        with Locations((13.4, 0.5)):
            Rectangle(SKETCH24_W, SKETCH24_H)
    extrude(amount=-CUT_EXTRUDE7_DEPTH, mode=Mode.SUBTRACT)

    # Sketch25 → Boss-Extrude17 (add)
    with BuildSketch(Plane(origin=(0, 0, -21), x_dir=(-1, 0, 0), z_dir=(0, 0, -1))):
        with Locations((13.25, 1.2)):
            Rectangle(SKETCH25_W, SKETCH25_H)
    extrude(amount=-BOSS_EXTRUDE17_DEPTH)

    # Sketch26 → Cut-Extrude8 (cut)
    with BuildSketch(Plane(origin=(0, 0, -21), x_dir=(-1, 0, 0), z_dir=(0, 0, -1))):
        with Locations((16.75, 5.3)):
            Rectangle(SKETCH26_W, SKETCH26_H)
    extrude(amount=-CUT_EXTRUDE8_DEPTH, mode=Mode.SUBTRACT)

    # Sketch27 → Cut-Extrude9 (cut)
    with BuildSketch(Plane(origin=(0, 0, -21), x_dir=(-1, 0, 0), z_dir=(0, 0, -1))):
        with Locations((-16.817086242, -5.3)):
            Rectangle(SKETCH27_W, SKETCH27_H)
    extrude(amount=-CUT_EXTRUDE9_DEPTH, mode=Mode.SUBTRACT)


solid = part.part
